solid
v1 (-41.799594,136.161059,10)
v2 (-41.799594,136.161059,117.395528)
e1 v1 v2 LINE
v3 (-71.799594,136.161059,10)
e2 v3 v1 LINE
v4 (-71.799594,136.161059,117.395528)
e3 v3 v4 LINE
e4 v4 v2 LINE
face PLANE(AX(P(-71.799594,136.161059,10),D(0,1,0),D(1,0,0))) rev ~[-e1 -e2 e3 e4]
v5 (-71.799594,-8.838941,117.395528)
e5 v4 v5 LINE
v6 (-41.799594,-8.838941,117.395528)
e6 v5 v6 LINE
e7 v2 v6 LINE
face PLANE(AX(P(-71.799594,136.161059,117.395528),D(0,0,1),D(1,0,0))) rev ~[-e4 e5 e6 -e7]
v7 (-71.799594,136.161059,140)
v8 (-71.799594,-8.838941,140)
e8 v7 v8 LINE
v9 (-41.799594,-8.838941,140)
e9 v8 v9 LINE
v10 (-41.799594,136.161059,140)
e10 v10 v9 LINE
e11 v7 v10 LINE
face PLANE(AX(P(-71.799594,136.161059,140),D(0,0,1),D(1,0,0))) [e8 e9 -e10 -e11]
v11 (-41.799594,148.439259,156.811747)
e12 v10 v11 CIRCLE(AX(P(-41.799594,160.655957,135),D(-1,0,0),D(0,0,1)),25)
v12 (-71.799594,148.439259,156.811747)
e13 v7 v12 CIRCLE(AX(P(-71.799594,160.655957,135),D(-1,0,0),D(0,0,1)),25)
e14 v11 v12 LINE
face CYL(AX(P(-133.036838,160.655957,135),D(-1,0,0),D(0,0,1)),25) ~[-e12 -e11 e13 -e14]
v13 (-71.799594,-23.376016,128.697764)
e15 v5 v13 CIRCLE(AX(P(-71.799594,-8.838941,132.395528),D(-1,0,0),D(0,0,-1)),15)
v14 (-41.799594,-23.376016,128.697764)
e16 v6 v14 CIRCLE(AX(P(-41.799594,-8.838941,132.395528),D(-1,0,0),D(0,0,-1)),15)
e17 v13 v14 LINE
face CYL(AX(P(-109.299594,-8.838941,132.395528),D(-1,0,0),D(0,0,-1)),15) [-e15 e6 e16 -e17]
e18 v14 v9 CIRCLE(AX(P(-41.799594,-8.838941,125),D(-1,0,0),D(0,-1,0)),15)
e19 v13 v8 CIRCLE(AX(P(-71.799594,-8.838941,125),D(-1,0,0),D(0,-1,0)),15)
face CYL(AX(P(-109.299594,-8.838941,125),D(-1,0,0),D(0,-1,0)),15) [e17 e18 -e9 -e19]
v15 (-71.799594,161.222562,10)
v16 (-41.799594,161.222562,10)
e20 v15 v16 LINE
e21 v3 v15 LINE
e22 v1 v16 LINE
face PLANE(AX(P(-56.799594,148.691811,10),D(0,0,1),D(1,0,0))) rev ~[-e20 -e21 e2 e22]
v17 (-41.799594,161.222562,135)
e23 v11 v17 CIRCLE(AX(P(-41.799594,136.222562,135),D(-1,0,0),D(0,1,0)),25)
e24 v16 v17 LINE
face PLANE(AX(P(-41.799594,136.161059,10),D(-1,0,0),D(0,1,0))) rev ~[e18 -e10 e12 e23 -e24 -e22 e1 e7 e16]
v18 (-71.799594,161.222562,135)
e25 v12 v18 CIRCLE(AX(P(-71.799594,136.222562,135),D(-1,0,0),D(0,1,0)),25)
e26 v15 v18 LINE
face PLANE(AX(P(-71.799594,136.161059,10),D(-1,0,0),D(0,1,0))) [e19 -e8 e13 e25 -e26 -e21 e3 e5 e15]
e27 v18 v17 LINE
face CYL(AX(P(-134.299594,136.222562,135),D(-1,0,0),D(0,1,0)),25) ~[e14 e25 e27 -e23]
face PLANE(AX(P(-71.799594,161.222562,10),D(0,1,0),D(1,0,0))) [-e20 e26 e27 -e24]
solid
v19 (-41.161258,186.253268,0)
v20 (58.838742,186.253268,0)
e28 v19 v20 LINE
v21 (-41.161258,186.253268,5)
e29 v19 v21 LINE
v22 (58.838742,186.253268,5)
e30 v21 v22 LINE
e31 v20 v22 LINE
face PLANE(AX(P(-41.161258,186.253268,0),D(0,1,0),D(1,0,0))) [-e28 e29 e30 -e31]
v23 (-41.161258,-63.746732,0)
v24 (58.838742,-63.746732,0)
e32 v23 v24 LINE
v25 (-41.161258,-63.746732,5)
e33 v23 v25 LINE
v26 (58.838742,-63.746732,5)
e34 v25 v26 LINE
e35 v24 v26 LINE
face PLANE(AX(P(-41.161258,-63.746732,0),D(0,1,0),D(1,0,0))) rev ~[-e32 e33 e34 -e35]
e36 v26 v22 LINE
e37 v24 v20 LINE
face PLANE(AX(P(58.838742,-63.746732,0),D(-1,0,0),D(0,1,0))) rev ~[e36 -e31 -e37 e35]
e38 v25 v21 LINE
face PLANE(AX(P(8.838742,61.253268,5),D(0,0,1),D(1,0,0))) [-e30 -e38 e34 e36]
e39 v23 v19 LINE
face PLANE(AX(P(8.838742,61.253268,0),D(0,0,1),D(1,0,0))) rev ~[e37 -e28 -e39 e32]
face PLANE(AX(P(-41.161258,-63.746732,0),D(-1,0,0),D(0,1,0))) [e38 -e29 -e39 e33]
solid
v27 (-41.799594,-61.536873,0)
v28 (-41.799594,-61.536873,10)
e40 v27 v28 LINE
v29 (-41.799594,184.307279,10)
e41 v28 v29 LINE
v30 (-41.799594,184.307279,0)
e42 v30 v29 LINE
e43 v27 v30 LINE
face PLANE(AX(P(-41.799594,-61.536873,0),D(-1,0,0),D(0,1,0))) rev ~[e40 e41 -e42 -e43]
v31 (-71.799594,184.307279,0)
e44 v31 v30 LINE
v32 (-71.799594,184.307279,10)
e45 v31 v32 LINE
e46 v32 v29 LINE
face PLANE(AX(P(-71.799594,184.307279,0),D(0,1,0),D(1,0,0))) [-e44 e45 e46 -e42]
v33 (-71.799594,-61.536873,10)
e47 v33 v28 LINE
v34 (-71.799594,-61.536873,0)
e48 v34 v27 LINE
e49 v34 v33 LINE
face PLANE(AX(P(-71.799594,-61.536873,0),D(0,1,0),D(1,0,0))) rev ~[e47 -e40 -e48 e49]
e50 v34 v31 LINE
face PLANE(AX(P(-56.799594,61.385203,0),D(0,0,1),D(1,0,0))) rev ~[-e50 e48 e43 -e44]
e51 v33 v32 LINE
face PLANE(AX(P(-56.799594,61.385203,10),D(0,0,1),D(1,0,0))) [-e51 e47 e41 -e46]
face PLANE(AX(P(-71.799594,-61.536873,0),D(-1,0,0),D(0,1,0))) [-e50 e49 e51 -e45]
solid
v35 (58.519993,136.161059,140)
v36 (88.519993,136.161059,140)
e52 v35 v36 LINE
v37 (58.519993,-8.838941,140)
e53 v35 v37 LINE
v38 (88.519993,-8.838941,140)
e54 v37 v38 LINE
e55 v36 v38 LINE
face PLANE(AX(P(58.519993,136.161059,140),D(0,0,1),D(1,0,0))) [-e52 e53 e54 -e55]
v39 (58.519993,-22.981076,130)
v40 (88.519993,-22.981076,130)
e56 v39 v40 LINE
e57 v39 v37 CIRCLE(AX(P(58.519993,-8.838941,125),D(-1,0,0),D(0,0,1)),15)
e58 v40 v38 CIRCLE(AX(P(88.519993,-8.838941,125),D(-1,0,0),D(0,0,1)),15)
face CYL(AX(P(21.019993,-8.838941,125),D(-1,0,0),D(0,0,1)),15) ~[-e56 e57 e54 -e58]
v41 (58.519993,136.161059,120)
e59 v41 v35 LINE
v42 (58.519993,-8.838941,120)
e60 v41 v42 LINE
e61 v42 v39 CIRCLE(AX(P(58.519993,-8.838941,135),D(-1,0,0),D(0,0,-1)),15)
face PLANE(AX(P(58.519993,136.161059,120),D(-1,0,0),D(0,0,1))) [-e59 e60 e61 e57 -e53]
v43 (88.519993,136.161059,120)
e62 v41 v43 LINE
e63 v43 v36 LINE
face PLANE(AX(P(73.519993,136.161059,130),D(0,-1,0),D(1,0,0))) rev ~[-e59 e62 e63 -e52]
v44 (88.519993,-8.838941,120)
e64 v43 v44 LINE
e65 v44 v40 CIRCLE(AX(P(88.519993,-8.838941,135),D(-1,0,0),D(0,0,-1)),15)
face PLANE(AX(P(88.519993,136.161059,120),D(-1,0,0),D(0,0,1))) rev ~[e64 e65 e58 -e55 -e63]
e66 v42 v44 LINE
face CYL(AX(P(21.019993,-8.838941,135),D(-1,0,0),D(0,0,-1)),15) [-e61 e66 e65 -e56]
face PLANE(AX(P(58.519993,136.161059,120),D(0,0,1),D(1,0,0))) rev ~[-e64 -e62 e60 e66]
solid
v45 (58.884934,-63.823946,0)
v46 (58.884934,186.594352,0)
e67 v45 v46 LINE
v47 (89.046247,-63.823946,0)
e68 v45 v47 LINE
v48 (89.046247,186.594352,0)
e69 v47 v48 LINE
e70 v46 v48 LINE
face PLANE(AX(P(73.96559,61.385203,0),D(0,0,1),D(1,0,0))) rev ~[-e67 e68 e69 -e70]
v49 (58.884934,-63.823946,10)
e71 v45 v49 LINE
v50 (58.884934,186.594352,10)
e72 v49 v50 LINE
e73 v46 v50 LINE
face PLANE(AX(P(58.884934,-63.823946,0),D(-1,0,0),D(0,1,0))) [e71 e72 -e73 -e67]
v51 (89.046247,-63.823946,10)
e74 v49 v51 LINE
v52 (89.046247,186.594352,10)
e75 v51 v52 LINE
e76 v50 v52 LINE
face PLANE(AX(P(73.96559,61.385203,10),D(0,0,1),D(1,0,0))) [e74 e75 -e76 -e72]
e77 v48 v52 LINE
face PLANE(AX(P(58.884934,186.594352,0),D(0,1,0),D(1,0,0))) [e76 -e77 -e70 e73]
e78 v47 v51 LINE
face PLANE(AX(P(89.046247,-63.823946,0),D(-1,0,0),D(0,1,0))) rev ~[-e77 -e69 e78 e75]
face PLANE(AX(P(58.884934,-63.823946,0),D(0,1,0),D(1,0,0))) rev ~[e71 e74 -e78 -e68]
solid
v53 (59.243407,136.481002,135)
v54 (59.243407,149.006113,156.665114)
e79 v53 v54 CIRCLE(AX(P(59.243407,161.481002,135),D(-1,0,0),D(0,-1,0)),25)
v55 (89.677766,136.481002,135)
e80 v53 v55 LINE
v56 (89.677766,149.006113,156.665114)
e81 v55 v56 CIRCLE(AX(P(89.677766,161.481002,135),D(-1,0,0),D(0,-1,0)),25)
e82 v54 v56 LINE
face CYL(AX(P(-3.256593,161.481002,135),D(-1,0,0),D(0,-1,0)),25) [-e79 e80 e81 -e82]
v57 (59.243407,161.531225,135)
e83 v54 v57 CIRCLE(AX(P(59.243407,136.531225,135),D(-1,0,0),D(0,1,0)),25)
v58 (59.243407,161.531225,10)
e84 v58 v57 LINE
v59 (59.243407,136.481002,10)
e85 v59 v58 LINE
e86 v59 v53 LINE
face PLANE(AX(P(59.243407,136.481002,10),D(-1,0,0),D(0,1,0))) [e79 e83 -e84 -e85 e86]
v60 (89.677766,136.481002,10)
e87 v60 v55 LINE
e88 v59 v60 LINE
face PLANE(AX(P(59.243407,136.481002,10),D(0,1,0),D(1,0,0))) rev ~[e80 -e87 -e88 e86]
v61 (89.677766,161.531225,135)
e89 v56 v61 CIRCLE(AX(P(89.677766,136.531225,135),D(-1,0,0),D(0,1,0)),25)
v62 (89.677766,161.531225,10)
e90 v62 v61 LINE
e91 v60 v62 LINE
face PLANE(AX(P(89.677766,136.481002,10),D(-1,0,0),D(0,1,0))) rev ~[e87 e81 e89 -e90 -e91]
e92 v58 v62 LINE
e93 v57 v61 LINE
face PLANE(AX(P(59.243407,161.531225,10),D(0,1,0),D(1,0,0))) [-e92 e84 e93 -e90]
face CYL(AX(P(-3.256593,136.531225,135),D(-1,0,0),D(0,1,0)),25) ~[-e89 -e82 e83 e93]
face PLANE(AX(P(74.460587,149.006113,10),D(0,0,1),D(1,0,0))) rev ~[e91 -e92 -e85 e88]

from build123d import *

# Parameters (mm, degrees)
F0_W          = 100
F0_H          = 250
F1_DEPTH      = 5
F2_W          = 30
F2_H          = 245.8441516644
F3_DEPTH      = 10
F2_W_2        = 30.1613137126
F2_H_2        = 250.4182979465
F4_W          = 30
F4_H          = 25.0615030527
F5_DEPTH      = 150
F4_W_2        = 30.434358865
F4_H_2        = 25.0502228737
F6_W          = 30
F6_H          = 22.6044723392
F7_DEPTH      = 160
F6_H_2        = 20
F8_T1_DEPTH   = 152.4744871392
F8_T3_DEPTH   = 155
F8_2_T1_DEPTH = 155.434358865
F9_T1_DEPTH   = 105
F9_2_T1_DEPTH = 105


# Not quite as in the source:
# - a fillet or chamfer that OpenCascade refuses, or shapes differently, is made with other operations: its cross-section is extruded or revolved along the edge and cut away or added


with BuildPart() as f1:
    # F0 (on Top) → F1 (new body)
    with BuildSketch(Plane.XY):
        with Locations((8.8387416875, 61.2532682717)):
            Rectangle(F0_W, F0_H)
    extrude(amount=F1_DEPTH)


with BuildPart() as f3:
    # F2 (on Top) → F3 (new body)
    with BuildSketch(Plane.XY):
        with Locations((-56.7995943129, 61.3852031529)):
            Rectangle(F2_W, F2_H)
    extrude(amount=F3_DEPTH)


with BuildPart() as f3b:
    # F2 (on Top) → F3, piece 2 (new body)
    with BuildSketch(Plane.XY):
        with Locations((73.9655904472, 61.3852031529)):
            Rectangle(F2_W_2, F2_H_2)
    extrude(amount=F3_DEPTH)


with BuildPart() as f5:
    # F4 (on face) → F5 (new body)
    with BuildSketch(Plane.XY.offset(10)):
        with Locations((-56.7995943129, 148.6918106675)):
            Rectangle(F4_W, F4_H)
    extrude(amount=F5_DEPTH)

    # F6 (on face) → F7 (join)
    with BuildSketch(Plane.XZ.offset(-136.1610591412)):
        with Locations((-56.7995943129, 128.6977638304)):
            Rectangle(F6_W, F6_H)
    extrude(amount=F7_DEPTH)

    # F8: fillet of radius 25 on 2 edges, made by hand

    # F8_s2 → F8_t1 (cut)
    with BuildSketch(Plane.YZ.offset(-133.0368378825)):
        with BuildLine():
            ThreePointArc((160.655956569, 160), (144.8445682681, 154.364916731), (136.1610591412, 140))
            Line((136.1610591412, 140), (136.1610591412, 160))
            Line((136.1610591412, 160), (160.655956569, 160))
        make_face()
    extrude(amount=F8_T1_DEPTH, mode=Mode.SUBTRACT)

    # F8_s4 → F8_t3 (cut)
    with BuildSketch(Plane.YZ.offset(-134.2995943129)):
        with BuildLine():
            ThreePointArc((161.2225621939, 135), (153.9002317235, 152.6776695297), (136.2225621939, 160))
            Line((136.2225621939, 160), (161.2225621939, 160))
            Line((161.2225621939, 160), (161.2225621939, 135))
        make_face()
    extrude(amount=F8_T3_DEPTH, mode=Mode.SUBTRACT)

    # F9: fillet of radius 15 on 2 edges, made by hand

    # F9_s2 → F9_t1 (cut)
    with BuildSketch(Plane.YZ.offset(-109.2995943129)):
        with BuildLine():
            ThreePointArc((-23.8389408588, 125), (-19.4455425766, 135.6066017178), (-8.8389408588, 140))
            Line((-8.8389408588, 140), (-23.8389408588, 140))
            Line((-23.8389408588, 140), (-23.8389408588, 125))
        make_face()
        with BuildLine():
            ThreePointArc((-8.8389408588, 117.3955276608), (-19.4455425766, 121.788925943), (-23.8389408588, 132.3955276608))
            Line((-23.8389408588, 132.3955276608), (-23.8389408588, 117.3955276608))
            Line((-23.8389408588, 117.3955276608), (-8.8389408588, 117.3955276608))
        make_face()
    extrude(amount=F9_T1_DEPTH, mode=Mode.SUBTRACT)


with BuildPart() as f5b:
    # F4 (on face) → F5, piece 2 (new body)
    with BuildSketch(Plane.XY.offset(10)):
        with Locations((74.460586533, 149.00611341)):
            Rectangle(F4_W_2, F4_H_2)
    extrude(amount=F5_DEPTH)

    # F8#2: fillet of radius 25 on 2 edges, made by hand

    # F8_2_s2 → F8_2_t1 (cut)
    with BuildSketch(Plane.YZ.offset(-3.2565928996)):
        with BuildLine():
            ThreePointArc((136.4810019732, 135), (143.8033324435, 152.6776695297), (161.4810019732, 160))
            Line((161.4810019732, 160), (136.4810019732, 160))
            Line((136.4810019732, 160), (136.4810019732, 135))
        make_face()
        with BuildLine():
            ThreePointArc((161.5312248468, 135), (154.2088943765, 152.6776695297), (136.5312248468, 160))
            Line((136.5312248468, 160), (161.5312248468, 160))
            Line((161.5312248468, 160), (161.5312248468, 135))
        make_face()
    extrude(amount=F8_2_T1_DEPTH, mode=Mode.SUBTRACT)


with BuildPart() as f7:
    # F6 (on face) → F7, piece 2 (new body)
    with BuildSketch(Plane.XZ.offset(-136.1610591412)):
        with Locations((73.5199929774, 130)):
            Rectangle(F6_W, F6_H_2)
    extrude(amount=F7_DEPTH)

    # F9#2: fillet of radius 15 on 2 edges, made by hand

    # F9_2_s2 → F9_2_t1 (cut)
    with BuildSketch(Plane.YZ.offset(21.0199929774)):
        with BuildLine():
            ThreePointArc((-8.8389408588, 140), (-19.4455425766, 135.6066017178), (-23.8389408588, 125))
            Line((-23.8389408588, 125), (-23.8389408588, 140))
            Line((-23.8389408588, 140), (-8.8389408588, 140))
        make_face()
        with BuildLine():
            ThreePointArc((-8.8389408588, 120), (-19.4455425766, 124.3933982822), (-23.8389408588, 135))
            Line((-23.8389408588, 135), (-23.8389408588, 120))
            Line((-23.8389408588, 120), (-8.8389408588, 120))
        make_face()
    extrude(amount=F9_2_T1_DEPTH, mode=Mode.SUBTRACT)


solid = Compound([f1.part, f3.part, f3b.part, f5.part, f5b.part, f7.part])
